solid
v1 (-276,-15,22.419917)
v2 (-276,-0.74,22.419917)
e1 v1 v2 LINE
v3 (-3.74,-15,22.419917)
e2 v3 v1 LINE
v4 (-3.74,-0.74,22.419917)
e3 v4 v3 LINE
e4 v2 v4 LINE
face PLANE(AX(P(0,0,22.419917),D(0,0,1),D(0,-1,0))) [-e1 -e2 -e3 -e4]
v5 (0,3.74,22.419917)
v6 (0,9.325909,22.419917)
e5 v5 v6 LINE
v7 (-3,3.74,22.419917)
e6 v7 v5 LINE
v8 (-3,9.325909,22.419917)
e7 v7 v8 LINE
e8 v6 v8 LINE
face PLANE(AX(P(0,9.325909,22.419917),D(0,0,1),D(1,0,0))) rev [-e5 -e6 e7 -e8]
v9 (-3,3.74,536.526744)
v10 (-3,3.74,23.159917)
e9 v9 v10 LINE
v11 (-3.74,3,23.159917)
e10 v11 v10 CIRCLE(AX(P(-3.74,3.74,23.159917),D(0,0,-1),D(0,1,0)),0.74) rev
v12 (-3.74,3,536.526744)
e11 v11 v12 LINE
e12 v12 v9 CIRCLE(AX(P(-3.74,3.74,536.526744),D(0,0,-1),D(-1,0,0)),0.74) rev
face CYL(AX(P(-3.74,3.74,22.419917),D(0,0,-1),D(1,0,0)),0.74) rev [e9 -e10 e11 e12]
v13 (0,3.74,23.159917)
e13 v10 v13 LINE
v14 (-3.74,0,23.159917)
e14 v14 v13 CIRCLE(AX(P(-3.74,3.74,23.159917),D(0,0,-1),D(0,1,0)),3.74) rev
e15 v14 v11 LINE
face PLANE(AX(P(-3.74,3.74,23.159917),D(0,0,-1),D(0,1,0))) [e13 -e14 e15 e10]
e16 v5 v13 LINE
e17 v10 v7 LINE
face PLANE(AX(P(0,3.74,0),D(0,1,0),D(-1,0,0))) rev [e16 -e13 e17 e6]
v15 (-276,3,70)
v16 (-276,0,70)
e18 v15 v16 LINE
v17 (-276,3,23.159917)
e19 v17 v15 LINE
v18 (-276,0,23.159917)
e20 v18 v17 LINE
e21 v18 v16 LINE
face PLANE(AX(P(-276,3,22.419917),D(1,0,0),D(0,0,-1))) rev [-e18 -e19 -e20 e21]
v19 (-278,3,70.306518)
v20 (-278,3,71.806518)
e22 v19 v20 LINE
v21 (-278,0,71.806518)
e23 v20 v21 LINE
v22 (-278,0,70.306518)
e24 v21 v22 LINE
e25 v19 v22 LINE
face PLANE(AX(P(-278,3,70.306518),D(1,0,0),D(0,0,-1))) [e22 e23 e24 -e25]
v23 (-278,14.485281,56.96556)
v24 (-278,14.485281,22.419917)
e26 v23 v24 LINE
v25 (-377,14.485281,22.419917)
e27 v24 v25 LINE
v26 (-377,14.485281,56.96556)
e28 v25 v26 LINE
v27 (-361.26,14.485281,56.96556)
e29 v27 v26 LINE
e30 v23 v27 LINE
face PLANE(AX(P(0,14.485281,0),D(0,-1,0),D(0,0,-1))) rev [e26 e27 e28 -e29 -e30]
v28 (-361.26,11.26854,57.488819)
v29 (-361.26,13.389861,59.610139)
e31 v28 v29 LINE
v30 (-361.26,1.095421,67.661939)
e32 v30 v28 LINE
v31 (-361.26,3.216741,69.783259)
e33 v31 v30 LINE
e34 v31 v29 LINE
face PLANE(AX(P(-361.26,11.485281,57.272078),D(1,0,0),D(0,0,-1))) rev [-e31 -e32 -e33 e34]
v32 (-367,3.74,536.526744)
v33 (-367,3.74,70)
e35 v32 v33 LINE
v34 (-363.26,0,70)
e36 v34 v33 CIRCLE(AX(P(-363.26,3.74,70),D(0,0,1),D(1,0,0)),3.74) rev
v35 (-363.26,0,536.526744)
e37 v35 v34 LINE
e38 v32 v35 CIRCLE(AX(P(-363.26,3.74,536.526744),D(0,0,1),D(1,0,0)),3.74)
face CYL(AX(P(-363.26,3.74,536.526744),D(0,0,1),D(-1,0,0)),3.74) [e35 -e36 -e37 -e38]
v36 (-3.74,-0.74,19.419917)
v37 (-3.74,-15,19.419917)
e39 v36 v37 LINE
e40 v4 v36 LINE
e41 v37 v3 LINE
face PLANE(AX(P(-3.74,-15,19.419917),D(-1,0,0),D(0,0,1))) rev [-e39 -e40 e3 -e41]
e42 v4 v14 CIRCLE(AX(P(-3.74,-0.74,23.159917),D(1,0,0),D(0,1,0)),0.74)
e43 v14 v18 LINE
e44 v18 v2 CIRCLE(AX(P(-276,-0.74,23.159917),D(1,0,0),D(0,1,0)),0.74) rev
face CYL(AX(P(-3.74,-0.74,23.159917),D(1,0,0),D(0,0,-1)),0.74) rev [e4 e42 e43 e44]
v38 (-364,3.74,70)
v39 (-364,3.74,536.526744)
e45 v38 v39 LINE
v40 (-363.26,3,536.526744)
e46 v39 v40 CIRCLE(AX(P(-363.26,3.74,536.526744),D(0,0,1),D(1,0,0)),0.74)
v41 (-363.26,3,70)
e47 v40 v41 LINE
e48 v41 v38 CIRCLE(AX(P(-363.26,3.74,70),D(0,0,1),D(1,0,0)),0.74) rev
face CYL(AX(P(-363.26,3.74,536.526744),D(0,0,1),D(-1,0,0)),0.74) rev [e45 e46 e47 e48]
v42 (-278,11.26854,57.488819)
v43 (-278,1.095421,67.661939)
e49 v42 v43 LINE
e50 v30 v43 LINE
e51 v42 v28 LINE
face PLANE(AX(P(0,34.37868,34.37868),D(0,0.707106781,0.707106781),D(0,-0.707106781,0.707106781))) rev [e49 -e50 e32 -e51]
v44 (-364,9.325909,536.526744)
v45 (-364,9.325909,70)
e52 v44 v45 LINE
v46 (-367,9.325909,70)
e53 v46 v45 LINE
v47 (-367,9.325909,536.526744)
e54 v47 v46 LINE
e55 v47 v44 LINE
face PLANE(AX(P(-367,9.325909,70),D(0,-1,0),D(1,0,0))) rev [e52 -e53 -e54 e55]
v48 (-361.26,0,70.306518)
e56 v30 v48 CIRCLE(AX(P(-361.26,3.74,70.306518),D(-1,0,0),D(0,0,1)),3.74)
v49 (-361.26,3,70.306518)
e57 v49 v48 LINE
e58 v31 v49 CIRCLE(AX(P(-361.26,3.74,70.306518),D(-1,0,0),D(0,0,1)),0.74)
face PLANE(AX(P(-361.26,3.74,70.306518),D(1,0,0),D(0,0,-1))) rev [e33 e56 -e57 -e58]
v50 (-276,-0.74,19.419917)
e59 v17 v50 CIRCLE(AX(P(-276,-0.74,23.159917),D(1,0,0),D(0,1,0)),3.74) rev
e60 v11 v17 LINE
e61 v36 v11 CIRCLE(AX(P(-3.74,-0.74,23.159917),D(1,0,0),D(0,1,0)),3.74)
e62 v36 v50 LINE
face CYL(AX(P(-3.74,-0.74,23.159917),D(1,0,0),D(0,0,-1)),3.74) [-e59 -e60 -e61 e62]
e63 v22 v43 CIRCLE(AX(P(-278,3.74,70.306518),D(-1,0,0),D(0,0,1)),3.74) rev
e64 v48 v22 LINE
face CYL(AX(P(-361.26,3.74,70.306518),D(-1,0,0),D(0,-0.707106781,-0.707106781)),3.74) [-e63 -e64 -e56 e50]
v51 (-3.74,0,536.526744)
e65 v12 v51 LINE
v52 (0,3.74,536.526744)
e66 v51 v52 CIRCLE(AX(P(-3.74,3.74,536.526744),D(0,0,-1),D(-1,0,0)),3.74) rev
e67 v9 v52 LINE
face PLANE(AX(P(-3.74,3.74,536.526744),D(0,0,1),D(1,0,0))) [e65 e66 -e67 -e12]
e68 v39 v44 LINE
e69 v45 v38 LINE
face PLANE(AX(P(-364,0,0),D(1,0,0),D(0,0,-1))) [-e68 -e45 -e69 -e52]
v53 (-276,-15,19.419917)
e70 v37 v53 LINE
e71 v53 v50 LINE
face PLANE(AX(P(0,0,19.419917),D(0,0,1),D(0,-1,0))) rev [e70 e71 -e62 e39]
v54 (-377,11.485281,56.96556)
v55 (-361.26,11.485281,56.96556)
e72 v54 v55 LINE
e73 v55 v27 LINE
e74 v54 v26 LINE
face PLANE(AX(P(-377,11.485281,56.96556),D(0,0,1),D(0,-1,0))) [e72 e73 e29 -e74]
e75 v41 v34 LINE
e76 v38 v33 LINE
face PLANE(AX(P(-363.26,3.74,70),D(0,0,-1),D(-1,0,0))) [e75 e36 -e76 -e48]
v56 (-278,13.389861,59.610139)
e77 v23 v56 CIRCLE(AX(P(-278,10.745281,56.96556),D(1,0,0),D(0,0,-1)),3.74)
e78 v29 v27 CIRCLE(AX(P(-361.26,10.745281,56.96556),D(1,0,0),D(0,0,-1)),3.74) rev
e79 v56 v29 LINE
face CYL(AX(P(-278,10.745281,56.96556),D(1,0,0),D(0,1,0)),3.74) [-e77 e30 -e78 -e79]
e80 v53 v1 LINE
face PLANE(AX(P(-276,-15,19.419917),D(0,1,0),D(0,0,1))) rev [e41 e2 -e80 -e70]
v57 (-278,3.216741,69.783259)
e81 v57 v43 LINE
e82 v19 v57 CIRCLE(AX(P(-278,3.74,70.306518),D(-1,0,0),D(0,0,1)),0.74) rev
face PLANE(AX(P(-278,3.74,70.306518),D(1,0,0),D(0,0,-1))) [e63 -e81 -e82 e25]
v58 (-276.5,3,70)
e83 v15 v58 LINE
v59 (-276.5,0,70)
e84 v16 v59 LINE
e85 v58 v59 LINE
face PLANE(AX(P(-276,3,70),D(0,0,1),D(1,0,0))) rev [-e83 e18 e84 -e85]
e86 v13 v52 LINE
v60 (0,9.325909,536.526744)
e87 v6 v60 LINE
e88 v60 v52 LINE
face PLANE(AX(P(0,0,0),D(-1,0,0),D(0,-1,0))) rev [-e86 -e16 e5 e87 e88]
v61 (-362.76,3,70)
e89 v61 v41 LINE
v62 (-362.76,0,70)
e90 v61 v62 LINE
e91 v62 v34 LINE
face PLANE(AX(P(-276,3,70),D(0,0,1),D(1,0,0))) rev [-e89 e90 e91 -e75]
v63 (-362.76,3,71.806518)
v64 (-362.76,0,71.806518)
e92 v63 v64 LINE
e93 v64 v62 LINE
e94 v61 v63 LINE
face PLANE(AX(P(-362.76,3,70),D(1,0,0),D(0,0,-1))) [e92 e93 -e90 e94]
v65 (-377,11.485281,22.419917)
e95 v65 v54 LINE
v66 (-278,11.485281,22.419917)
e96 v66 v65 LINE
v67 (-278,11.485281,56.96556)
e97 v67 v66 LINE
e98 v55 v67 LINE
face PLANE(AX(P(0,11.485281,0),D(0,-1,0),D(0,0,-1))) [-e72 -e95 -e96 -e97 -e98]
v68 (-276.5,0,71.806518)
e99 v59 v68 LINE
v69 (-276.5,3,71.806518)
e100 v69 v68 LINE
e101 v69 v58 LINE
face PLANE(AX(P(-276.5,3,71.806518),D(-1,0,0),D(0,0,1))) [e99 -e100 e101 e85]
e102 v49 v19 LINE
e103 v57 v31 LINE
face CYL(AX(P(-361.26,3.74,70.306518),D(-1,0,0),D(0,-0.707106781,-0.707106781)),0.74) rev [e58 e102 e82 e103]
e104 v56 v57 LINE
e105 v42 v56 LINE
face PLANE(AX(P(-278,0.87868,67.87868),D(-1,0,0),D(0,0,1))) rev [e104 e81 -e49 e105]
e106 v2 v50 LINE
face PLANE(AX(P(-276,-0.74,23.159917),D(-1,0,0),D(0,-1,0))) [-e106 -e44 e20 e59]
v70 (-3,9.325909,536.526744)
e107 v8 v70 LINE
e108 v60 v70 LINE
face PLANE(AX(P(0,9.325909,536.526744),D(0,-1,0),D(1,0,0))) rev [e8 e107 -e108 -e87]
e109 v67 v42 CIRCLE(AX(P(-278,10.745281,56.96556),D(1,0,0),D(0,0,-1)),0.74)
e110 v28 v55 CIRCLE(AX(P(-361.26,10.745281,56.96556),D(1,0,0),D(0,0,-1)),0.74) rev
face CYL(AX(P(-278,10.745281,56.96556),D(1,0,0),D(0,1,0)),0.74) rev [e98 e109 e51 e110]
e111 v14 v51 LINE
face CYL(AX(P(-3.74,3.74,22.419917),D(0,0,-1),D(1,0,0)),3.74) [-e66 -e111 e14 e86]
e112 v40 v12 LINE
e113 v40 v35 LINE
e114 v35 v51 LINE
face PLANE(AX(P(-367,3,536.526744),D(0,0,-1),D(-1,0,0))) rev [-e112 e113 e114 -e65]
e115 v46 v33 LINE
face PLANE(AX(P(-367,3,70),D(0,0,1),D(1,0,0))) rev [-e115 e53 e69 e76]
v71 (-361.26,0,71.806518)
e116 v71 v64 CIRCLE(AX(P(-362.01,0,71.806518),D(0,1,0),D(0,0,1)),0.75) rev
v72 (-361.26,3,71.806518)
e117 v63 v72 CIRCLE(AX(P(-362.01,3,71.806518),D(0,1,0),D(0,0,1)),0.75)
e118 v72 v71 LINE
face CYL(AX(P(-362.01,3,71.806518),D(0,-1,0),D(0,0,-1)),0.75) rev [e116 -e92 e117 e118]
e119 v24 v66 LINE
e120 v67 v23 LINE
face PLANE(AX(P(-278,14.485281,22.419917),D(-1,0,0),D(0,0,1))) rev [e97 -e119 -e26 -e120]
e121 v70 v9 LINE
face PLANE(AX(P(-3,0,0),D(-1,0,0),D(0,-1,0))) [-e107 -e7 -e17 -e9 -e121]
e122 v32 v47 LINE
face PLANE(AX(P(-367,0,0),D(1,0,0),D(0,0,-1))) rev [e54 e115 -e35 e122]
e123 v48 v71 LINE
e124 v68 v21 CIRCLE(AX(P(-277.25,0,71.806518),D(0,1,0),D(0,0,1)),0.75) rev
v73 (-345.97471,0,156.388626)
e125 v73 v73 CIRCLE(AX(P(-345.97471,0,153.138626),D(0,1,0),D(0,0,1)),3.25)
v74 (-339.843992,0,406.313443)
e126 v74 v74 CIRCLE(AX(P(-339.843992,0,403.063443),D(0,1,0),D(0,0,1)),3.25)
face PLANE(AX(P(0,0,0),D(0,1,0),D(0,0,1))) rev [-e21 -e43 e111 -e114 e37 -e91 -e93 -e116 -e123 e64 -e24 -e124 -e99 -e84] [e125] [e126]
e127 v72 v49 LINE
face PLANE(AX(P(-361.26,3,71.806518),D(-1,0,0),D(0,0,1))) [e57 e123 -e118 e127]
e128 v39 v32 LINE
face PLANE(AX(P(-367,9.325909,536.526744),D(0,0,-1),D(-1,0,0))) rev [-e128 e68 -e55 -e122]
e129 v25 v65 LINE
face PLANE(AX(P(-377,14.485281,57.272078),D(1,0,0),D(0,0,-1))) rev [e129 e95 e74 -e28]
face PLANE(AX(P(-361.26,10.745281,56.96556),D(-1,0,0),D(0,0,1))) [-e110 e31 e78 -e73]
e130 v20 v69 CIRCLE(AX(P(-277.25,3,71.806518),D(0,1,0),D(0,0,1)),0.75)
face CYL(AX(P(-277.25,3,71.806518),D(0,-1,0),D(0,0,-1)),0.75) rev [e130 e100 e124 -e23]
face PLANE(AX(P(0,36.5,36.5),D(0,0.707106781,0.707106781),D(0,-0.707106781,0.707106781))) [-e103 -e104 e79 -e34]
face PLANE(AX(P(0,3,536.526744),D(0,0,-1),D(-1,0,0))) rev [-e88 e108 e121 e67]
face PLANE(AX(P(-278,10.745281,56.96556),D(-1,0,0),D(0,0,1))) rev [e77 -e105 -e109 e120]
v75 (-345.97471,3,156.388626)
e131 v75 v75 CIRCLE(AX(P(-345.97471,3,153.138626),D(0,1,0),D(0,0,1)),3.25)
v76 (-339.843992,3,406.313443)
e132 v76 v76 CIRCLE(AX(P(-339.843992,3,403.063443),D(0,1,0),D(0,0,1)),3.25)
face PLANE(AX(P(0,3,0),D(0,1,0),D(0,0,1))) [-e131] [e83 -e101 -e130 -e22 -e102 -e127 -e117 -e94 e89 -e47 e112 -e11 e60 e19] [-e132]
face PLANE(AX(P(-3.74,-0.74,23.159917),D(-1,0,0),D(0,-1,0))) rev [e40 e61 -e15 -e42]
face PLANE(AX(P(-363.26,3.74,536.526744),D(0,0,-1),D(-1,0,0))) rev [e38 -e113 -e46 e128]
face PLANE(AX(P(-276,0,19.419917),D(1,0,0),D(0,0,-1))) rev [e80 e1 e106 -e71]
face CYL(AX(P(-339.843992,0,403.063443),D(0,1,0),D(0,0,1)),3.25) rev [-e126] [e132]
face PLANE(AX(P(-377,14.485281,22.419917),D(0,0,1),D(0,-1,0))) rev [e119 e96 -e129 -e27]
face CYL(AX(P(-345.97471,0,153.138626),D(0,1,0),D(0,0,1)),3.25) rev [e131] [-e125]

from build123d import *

# Parameters (mm, degrees)
SM_BASE_FLANGE_1_DEPTH           = 3
SM_EDGE_FLANGE_1_STRIP_W         = 13.48
SM_EDGE_FLANGE_1_STRIP_H         = 3
SM_EDGE_FLANGE_1_STRIP_CUT_DEPTH = 466.526743508
SM_EDGE_FLANGE_1_DEPTH           = 466.526743508
SM_EDGE_FLANGE_2_STRIP_W         = 13.48
SM_EDGE_FLANGE_2_STRIP_H         = 3
SM_EDGE_FLANGE_2_STRIP_CUT_DEPTH = 514.106826818
SM_EDGE_FLANGE_2_DEPTH           = 514.106826818
SM_START                         = -362.76
SM_EDGE_FLANGE_5_DEPTH           = 86.26
SM_START_2                       = -361.26
SM_EDGE_FLANGE_5_2_DEPTH         = 83.26
SM_START_3                       = -1
SM_EDGE_FLANGE_5_3_DEPTH         = 4.216740982
SM_EDGE_FLANGE_6_STRIP_CUT_DEPTH = 83.26
SM_EDGE_FLANGE_6_DEPTH           = 83.26
SM_START_4                       = 3
SM_EDGE_FLANGE_6_PROFILE_W       = 99
SM_EDGE_FLANGE_6_PROFILE_H       = 34.545643213
SM_EDGE_FLANGE_6_FLAT_DEPTH      = 3
SM_START_5                       = -3.74
SM_EDGE_FLANGE_7_DEPTH           = 4.74
SM_START_6                       = -276
SM_EDGE_FLANGE_7_2_DEPTH         = 272.26
SM_EDGE_FLANGE_7_3_DEPTH         = 272.26
SKETCH_29_R                      = 3.25
CUT_EXTRUDE_1_DEPTH              = 5


with BuildPart() as part:
    # Базовая кромка1: sheet metal written as solids
    # Sketch 1 → Базовая кромка1 (new body)
    with BuildSketch(Plane(origin=(0, 0, 0), x_dir=(1, 0, 0), z_dir=(0, 1, 0))):
        Polygon((-367, -536.526743508), (0, -536.526743508), (0, -22.41991669), (-276, -22.41991669), (-276, -70), (-367, -70), align=None)
    extrude(amount=SM_BASE_FLANGE_1_DEPTH)

    # Ребро-кромка1: sheet metal written as solids
    # Ребро-кромка1 strip (on a plane across the edge) → Ребро-кромка1 strip cut (cut)
    with BuildSketch(Plane(origin=(-367, 3, 70), x_dir=(1, 0, 0), z_dir=(0, 0, 1))):
        with Locations((-3, -1.5)):
            Rectangle(SM_EDGE_FLANGE_1_STRIP_W, SM_EDGE_FLANGE_1_STRIP_H)
    extrude(amount=SM_EDGE_FLANGE_1_STRIP_CUT_DEPTH, mode=Mode.SUBTRACT)

    # Ребро-кромка1 section (on a plane across the edge) → Ребро-кромка1 (add)
    with BuildSketch(Plane(origin=(-367, 3, 70), x_dir=(1, 0, 0), z_dir=(0, 0, 1))):
        with BuildLine():
            Line((0, 0.74), (0, 6.325908943))
            Line((0, 6.325908943), (3, 6.325908943))
            Line((3, 6.325908943), (3, 0.74))
            ThreePointArc((3, 0.74), (3.216740982, 0.216740982), (3.74, 0))
            Line((3.74, 0), (3.74, -3))
            ThreePointArc((3.74, -3), (1.095420638, -1.904579362), (0, 0.74))
        make_face()
    extrude(amount=SM_EDGE_FLANGE_1_DEPTH)

    # Ребро-кромка2: sheet metal written as solids
    # Ребро-кромка2 strip (on a plane across the edge) → Ребро-кромка2 strip cut (cut)
    with BuildSketch(Plane(origin=(0, 3, 536.526743508), x_dir=(-1, 0, 0), z_dir=(0, 0, -1))):
        with Locations((-3, -1.5)):
            Rectangle(SM_EDGE_FLANGE_2_STRIP_W, SM_EDGE_FLANGE_2_STRIP_H)
    extrude(amount=SM_EDGE_FLANGE_2_STRIP_CUT_DEPTH, mode=Mode.SUBTRACT)

    # Ребро-кромка2 section (on a plane across the edge) → Ребро-кромка2 (add)
    with BuildSketch(Plane(origin=(0, 3, 536.526743508), x_dir=(-1, 0, 0), z_dir=(0, 0, -1))):
        with BuildLine():
            Line((0, 0.74), (0, 6.325908943))
            Line((0, 6.325908943), (3, 6.325908943))
            Line((3, 6.325908943), (3, 0.74))
            ThreePointArc((3, 0.74), (3.216740982, 0.216740982), (3.74, 0))
            Line((3.74, 0), (3.74, -3))
            ThreePointArc((3.74, -3), (1.095420638, -1.904579362), (0, 0.74))
        make_face()
    extrude(amount=SM_EDGE_FLANGE_2_DEPTH)

    # Ребро-кромка5: read off the stored shape, not the designer's step
    # Ребро-кромка5 outline → Ребро-кромка5 (cut)
    with BuildSketch(Plane.YZ.offset(SM_START)):
        with BuildLine():
            Line((0, 70), (0.012581766, 70))
            ThreePointArc((0.012581766, 70), (0.003146765, 70.15312996), (0, 70.306518036))
            Line((0, 70.306518036), (0, 70))
        make_face()
    extrude(amount=SM_EDGE_FLANGE_5_DEPTH, mode=Mode.SUBTRACT)

    # Sm Edge Flange 5 2 outline → Sm Edge Flange 5 2 (add)
    with BuildSketch(Plane.YZ.offset(SM_START_2)):
        with BuildLine():
            ThreePointArc((0.012581766, 70), (0.346296855, 68.73477411), (1.095420638, 67.661938675))
            Line((1.095420638, 67.661938675), (11.485281374, 57.272077939))
            Line((11.485281374, 57.272077939), (13.606601718, 59.393398282))
            Line((13.606601718, 59.393398282), (3.216740982, 69.783259018))
            ThreePointArc((3.216740982, 69.783259018), (3.056329146, 70.023332296), (3, 70.306518036))
            Line((3, 70.306518036), (3, 70))
            Line((3, 70), (0.012581766, 70))
        make_face()
    extrude(amount=SM_EDGE_FLANGE_5_2_DEPTH)

    # Sm Edge Flange 5 3 outline → Sm Edge Flange 5 3 (cut)
    with BuildSketch(Plane(origin=(0, 0, 0), x_dir=(1, 0, 0), z_dir=(0, 1, 0)).offset(SM_START_3)):
        with BuildLine():
            ThreePointArc((-362.76, -71.806518036), (-362.01, -72.556518036), (-361.26, -71.806518036))
            Line((-361.26, -71.806518036), (-361.26, -70))
            Line((-361.26, -70), (-362.76, -70))
            Line((-362.76, -70), (-362.76, -71.806518036))
        make_face()
        with BuildLine():
            Line((-278, -70), (-278, -71.806518036))
            ThreePointArc((-278, -71.806518036), (-277.25, -72.556518036), (-276.5, -71.806518036))
            Line((-276.5, -71.806518036), (-276.5, -70))
            Line((-276.5, -70), (-278, -70))
        make_face()
    extrude(amount=SM_EDGE_FLANGE_5_3_DEPTH, mode=Mode.SUBTRACT)

    # Ребро-кромка6: sheet metal written as solids
    # Ребро-кромка6 strip (on a plane across the edge) → Ребро-кромка6 strip cut (cut)
    with BuildSketch(Plane(origin=(-361.26, 11.485281374, 57.272077939), x_dir=(0, -1, 0), z_dir=(1, 0, 0))):
        Polygon((-11.436378772, 7.193738085), (-1.904579362, -2.338061325), (0.216740982, -0.216740982), (-9.315058428, 9.315058428), align=None)
    extrude(amount=SM_EDGE_FLANGE_6_STRIP_CUT_DEPTH, mode=Mode.SUBTRACT)

    # Ребро-кромка6 bend section (on a plane across the edge) → Ребро-кромка6 (add)
    with BuildSketch(Plane(origin=(-361.26, 11.485281374, 57.272077939), x_dir=(0, -1, 0), z_dir=(1, 0, 0))):
        with BuildLine():
            Line((-3, 0.306518036), (0, 0.306518036))
            ThreePointArc((0, 0.306518036), (0.056329146, 0.023332296), (0.216740982, -0.216740982))
            Line((0.216740982, -0.216740982), (-1.904579362, -2.338061325))
            ThreePointArc((-1.904579362, -2.338061325), (-2.715309452, -1.124718001), (-3, 0.306518036))
        make_face()
    extrude(amount=SM_EDGE_FLANGE_6_DEPTH)

    # Ребро-кромка6 profile (on flange) → Ребро-кромка6 flat (add)
    with BuildSketch(Plane(origin=(0, 11.485281374, 57.272077939), x_dir=(1, 0, 0), z_dir=(0, 1, 0)).offset(SM_START_4)):
        with Locations((-327.5, 17.579339643)):
            Rectangle(SM_EDGE_FLANGE_6_PROFILE_W, SM_EDGE_FLANGE_6_PROFILE_H)
    extrude(amount=-SM_EDGE_FLANGE_6_FLAT_DEPTH)

    # Ребро-кромка7: read off the stored shape, not the designer's step
    # Ребро-кромка7 outline → Ребро-кромка7 (cut)
    with BuildSketch(Plane.YZ.offset(SM_START_5)):
        with BuildLine():
            Line((3.74, 22.41991669), (3.74, 23.15991669))
            Line((3.74, 23.15991669), (0, 23.15991669))
            ThreePointArc((0, 23.15991669), (-0.216740982, 22.636657672), (-0.74, 22.41991669))
            Line((-0.74, 22.41991669), (-15, 22.41991669))
            Line((-15, 22.41991669), (-15, 19.41991669))
            Line((-15, 19.41991669), (-0.74, 19.41991669))
            ThreePointArc((-0.74, 19.41991669), (1.628543857, 20.265508287), (2.926060556, 22.41991669))
            Line((2.926060556, 22.41991669), (3.74, 22.41991669))
        make_face()
    extrude(amount=SM_EDGE_FLANGE_7_DEPTH, mode=Mode.SUBTRACT)

    # Sm Edge Flange 7 2 outline → Sm Edge Flange 7 2 (cut)
    with BuildSketch(Plane.YZ.offset(SM_START_6)):
        with BuildLine():
            Line((2.926060556, 22.41991669), (3.74, 22.41991669))
            Line((3.74, 22.41991669), (3.74, 23.15991669))
            Line((3.74, 23.15991669), (3, 23.15991669))
            ThreePointArc((3, 23.15991669), (2.981469231, 22.788074304), (2.926060556, 22.41991669))
        make_face()
    extrude(amount=SM_EDGE_FLANGE_7_2_DEPTH, mode=Mode.SUBTRACT)

    # Sm Edge Flange 7 3 outline → Sm Edge Flange 7 3 (add)
    with BuildSketch(Plane.YZ.offset(SM_START_6)):
        with BuildLine():
            ThreePointArc((2.926060556, 22.41991669), (2.981469231, 22.788074304), (3, 23.15991669))
            Line((3, 23.15991669), (0, 23.15991669))
            ThreePointArc((0, 23.15991669), (-0.216740982, 22.636657672), (-0.74, 22.41991669))
            Line((-0.74, 22.41991669), (-15, 22.41991669))
            Line((-15, 22.41991669), (-15, 19.41991669))
            Line((-15, 19.41991669), (-0.74, 19.41991669))
            ThreePointArc((-0.74, 19.41991669), (1.628543857, 20.265508287), (2.926060556, 22.41991669))
        make_face()
    extrude(amount=SM_EDGE_FLANGE_7_3_DEPTH)

    # Эскиз29 → Вырез-Вытянуть1 (cut)
    with BuildSketch(Plane(origin=(0, 3, 0), x_dir=(1, 0, 0), z_dir=(0, 1, 0))):
        with Locations(Location((-345.974710107, -153.138626068, 0), (0, 0, 270))):
            Circle(SKETCH_29_R)
        with Locations(Location((-339.843991697, -403.063443347, 0), (0, 0, 270))):
            Circle(SKETCH_29_R)
    extrude(amount=-CUT_EXTRUDE_1_DEPTH, mode=Mode.SUBTRACT)


solid = part.part
